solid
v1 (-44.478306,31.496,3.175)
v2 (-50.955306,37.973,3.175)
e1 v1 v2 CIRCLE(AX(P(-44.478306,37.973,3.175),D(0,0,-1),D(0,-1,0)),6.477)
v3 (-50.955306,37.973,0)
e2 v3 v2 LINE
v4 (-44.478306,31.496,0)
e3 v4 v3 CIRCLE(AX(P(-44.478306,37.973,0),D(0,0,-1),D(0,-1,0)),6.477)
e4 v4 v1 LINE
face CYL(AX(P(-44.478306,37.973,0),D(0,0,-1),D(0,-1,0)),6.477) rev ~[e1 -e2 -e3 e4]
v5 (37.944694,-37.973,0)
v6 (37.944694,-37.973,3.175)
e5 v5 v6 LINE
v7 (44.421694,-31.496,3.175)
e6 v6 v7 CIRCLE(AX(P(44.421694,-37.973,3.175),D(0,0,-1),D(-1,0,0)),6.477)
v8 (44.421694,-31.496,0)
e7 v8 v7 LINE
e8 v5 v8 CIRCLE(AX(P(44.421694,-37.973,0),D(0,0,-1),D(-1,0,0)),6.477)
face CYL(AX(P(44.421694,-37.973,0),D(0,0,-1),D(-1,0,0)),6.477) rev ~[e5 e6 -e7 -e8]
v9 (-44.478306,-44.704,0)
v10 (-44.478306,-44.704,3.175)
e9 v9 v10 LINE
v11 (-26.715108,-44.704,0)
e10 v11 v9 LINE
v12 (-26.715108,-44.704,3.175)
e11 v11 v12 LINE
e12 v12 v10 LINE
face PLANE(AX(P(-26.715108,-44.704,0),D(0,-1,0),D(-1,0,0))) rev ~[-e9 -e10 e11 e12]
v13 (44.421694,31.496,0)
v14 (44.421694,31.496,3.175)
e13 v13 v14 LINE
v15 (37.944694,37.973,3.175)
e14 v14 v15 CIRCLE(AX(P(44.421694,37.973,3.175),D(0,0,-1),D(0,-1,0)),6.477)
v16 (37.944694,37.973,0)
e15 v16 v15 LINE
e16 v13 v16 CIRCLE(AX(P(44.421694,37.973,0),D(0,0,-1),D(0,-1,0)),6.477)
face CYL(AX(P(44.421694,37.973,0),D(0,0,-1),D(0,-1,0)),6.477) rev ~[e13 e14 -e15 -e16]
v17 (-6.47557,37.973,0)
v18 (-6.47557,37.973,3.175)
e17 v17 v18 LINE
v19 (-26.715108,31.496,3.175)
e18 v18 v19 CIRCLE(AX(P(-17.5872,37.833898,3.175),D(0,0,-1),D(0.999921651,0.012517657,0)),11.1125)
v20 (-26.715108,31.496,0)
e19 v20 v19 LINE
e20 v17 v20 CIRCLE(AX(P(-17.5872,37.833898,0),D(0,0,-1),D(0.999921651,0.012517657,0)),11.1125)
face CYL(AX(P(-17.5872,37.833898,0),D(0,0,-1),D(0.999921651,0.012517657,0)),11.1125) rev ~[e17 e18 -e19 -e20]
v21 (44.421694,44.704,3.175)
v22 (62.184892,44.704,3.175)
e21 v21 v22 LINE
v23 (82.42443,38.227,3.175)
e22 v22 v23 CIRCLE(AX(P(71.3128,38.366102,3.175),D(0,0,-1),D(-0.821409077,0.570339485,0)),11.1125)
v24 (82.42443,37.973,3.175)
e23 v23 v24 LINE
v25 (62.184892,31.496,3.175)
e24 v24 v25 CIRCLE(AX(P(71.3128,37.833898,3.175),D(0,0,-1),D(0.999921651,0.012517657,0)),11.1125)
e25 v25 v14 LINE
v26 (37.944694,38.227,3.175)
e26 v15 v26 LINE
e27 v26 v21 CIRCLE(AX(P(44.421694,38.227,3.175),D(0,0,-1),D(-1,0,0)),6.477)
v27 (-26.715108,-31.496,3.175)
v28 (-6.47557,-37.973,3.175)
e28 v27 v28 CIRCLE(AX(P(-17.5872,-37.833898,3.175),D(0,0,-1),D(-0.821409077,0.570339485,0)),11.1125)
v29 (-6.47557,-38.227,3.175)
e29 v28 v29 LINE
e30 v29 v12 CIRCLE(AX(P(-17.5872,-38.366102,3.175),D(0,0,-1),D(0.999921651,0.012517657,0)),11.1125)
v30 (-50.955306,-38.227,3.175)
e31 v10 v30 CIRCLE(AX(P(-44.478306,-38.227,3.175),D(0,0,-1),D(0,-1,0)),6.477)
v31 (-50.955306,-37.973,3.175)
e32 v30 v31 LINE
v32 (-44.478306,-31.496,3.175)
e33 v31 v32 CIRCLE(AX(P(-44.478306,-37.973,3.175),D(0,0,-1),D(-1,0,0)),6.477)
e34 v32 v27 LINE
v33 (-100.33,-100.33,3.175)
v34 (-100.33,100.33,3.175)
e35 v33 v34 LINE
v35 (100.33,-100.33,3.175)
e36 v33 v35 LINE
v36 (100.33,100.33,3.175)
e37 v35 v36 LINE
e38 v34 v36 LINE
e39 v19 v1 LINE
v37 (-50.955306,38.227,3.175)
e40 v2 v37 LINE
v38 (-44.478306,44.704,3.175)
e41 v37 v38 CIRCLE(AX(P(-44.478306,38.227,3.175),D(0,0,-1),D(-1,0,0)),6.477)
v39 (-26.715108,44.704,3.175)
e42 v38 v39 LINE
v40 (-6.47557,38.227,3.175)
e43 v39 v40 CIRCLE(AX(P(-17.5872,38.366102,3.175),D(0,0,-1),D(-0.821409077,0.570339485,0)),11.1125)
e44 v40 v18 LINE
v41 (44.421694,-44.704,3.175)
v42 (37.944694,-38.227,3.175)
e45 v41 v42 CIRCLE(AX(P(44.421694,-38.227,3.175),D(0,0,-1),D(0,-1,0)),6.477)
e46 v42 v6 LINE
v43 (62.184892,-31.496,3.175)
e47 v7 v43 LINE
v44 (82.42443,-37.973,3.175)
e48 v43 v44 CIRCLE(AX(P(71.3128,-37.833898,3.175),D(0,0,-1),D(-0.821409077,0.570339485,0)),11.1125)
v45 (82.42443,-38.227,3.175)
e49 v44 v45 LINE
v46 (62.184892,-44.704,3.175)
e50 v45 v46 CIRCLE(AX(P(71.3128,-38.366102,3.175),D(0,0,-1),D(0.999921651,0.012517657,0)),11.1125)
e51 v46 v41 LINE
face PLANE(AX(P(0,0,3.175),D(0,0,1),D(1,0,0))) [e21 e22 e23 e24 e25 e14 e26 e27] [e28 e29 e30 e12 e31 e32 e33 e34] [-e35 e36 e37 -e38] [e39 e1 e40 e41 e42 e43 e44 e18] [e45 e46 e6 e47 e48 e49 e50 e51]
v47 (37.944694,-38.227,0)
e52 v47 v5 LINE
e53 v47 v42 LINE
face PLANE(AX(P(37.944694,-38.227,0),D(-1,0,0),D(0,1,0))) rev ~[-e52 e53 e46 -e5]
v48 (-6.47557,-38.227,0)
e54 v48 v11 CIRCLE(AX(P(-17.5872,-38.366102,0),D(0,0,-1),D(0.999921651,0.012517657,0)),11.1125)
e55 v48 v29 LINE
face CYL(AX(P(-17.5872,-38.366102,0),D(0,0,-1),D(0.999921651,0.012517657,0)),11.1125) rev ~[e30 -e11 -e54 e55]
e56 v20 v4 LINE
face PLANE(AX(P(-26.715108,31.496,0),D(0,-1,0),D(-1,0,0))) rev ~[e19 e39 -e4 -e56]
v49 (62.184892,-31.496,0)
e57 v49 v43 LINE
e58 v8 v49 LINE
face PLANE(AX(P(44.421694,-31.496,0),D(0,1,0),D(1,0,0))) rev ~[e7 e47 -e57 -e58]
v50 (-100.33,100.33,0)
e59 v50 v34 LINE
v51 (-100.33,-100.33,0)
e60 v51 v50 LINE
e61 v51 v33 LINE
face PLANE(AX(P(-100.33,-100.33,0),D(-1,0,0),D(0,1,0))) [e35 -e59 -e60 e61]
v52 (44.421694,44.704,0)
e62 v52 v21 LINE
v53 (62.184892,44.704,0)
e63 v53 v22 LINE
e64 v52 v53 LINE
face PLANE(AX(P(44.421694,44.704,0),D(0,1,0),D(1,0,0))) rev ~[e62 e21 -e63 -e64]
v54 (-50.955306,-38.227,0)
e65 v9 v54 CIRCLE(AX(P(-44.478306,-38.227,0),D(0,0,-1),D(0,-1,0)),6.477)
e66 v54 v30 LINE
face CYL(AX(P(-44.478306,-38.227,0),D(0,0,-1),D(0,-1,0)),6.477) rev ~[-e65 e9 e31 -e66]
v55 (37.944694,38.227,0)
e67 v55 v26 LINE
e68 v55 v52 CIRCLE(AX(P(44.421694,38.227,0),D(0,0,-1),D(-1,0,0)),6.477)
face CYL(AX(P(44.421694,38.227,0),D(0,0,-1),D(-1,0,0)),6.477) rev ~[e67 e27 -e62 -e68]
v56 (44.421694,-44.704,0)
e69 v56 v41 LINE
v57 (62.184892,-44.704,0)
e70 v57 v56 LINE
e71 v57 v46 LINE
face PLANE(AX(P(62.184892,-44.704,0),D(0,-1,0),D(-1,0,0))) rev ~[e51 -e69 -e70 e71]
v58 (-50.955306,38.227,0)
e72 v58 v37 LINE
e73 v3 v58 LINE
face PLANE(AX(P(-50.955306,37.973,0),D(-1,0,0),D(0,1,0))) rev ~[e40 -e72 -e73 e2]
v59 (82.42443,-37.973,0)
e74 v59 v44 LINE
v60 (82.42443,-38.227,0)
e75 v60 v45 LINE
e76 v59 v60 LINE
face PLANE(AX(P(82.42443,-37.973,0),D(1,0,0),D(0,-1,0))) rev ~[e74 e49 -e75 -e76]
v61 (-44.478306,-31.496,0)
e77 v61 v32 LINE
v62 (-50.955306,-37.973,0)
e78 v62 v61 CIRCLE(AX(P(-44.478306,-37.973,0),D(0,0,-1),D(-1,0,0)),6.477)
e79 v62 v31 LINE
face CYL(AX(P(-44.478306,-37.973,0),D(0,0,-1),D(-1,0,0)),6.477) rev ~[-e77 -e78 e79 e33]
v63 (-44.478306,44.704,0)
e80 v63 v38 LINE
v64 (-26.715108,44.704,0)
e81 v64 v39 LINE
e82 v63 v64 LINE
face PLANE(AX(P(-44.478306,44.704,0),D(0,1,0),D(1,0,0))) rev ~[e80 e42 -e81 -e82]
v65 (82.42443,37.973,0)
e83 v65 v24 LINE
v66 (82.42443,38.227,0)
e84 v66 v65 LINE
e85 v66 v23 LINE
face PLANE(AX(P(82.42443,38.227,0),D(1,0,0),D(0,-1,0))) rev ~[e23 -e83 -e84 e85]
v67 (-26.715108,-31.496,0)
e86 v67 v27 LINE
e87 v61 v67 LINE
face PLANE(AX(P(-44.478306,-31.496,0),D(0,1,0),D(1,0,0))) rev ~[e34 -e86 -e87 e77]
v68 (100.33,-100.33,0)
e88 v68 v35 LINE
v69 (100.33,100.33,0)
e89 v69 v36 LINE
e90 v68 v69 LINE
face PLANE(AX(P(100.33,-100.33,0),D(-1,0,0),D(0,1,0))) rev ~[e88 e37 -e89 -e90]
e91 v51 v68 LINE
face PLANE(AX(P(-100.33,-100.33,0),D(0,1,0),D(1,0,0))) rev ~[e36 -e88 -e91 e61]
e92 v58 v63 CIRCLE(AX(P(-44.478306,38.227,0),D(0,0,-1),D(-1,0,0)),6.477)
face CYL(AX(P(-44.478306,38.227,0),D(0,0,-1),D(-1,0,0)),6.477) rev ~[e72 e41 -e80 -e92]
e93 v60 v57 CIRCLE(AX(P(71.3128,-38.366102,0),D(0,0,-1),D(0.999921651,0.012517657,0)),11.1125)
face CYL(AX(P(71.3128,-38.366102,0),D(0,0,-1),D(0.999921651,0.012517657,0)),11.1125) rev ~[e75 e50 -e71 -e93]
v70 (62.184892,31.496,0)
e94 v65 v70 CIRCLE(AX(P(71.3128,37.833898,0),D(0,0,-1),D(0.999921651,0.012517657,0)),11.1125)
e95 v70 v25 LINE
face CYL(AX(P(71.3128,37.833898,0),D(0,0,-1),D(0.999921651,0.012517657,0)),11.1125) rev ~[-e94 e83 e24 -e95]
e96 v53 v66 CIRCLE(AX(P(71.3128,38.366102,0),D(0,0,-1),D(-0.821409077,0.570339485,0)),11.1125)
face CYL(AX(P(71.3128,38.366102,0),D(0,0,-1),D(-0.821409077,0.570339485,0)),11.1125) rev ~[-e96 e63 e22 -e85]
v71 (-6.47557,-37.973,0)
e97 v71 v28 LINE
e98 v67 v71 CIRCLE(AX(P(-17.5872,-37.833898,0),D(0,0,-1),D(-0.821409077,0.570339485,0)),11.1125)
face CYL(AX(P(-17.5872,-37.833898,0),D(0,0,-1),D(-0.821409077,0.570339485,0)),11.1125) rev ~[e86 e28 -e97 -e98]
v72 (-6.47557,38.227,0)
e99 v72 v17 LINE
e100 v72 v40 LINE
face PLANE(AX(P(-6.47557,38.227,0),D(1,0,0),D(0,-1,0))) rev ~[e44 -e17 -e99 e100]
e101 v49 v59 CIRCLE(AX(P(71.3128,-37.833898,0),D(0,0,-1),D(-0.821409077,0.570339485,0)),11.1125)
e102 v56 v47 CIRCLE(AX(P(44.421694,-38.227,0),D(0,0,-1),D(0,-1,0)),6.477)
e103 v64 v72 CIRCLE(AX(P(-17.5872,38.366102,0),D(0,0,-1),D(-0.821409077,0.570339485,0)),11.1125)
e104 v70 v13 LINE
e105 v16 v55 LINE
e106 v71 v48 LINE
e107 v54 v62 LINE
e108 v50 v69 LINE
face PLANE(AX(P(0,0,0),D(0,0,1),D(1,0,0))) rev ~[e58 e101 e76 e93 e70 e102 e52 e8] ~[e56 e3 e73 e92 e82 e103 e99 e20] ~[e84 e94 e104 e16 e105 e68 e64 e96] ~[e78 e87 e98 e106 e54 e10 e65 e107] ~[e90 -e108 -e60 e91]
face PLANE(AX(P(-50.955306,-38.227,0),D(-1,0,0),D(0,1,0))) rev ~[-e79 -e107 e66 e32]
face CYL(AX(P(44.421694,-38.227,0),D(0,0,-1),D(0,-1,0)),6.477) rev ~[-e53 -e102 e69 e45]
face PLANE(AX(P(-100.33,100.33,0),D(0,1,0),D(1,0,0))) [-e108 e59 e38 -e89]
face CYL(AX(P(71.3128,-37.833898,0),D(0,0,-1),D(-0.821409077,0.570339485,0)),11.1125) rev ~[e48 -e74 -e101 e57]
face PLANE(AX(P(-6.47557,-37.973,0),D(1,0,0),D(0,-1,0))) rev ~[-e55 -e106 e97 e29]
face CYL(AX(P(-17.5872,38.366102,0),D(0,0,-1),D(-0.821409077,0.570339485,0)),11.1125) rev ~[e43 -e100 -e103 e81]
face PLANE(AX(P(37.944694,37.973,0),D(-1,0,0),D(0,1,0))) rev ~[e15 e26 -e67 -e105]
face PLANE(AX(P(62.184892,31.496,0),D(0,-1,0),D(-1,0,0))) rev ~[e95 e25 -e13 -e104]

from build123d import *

# Parameters (mm, degrees)
F0_W     = 200.66
F0_H     = 200.66
F1_DEPTH = 3.175


# Not quite as in the source:
# - a length typed as a fraction of an inch, garbled in the dataset ("3 / 203.2 mm" for 3/8 in), is restored


with BuildPart() as f1:
    # F0 (on Top) → F1 (new body)
    with BuildSketch(Plane.XY):
        Rectangle(F0_W, F0_H)
        with BuildLine():
            Line((-6.4755703305, -37.973), (-6.4755703305, -38.227))
            ThreePointArc((-6.4755703305, -38.227), (-14.2002143688, -48.9498629888), (-26.715108043, -44.704))
            Line((-26.715108043, -44.704), (-30.0367761716, -44.704))
            Line((-30.0367761716, -44.704), (-44.4783061624, -44.704))
            ThreePointArc((-44.4783061624, -44.704), (-49.0582367841, -42.8069306217), (-50.9553061624, -38.227))
            Line((-50.9553061624, -38.227), (-50.9553061624, -37.973))
            ThreePointArc((-50.9553061624, -37.973), (-49.0582367841, -33.3930693783), (-44.4783061624, -31.496))
            Line((-44.4783061624, -31.496), (-30.0367761716, -31.496))
            Line((-30.0367761716, -31.496), (-26.715108043, -31.496))
            ThreePointArc((-26.715108043, -31.496), (-14.2002143688, -27.2501370112), (-6.4755703305, -37.973))
        make_face(mode=Mode.SUBTRACT)
        with BuildLine():
            Line((82.4244296695, -37.973), (82.4244296695, -38.227))
            ThreePointArc((82.4244296695, -38.227), (74.6997856312, -48.9498629888), (62.184891957, -44.704))
            Line((62.184891957, -44.704), (58.8632238284, -44.704))
            Line((58.8632238284, -44.704), (44.4216938376, -44.704))
            ThreePointArc((44.4216938376, -44.704), (39.8417632159, -42.8069306217), (37.9446938376, -38.227))
            Line((37.9446938376, -38.227), (37.9446938376, -37.973))
            ThreePointArc((37.9446938376, -37.973), (39.8417632159, -33.3930693783), (44.4216938376, -31.496))
            Line((44.4216938376, -31.496), (58.8632238284, -31.496))
            Line((58.8632238284, -31.496), (62.184891957, -31.496))
            ThreePointArc((62.184891957, -31.496), (74.6997856312, -27.2501370112), (82.4244296695, -37.973))
        make_face(mode=Mode.SUBTRACT)
        with BuildLine():
            ThreePointArc((-50.9553061624, 38.227), (-49.0582367841, 42.8069306217), (-44.4783061624, 44.704))
            Line((-44.4783061624, 44.704), (-30.0367761716, 44.704))
            Line((-30.0367761716, 44.704), (-26.715108043, 44.704))
            ThreePointArc((-26.715108043, 44.704), (-14.2002143688, 48.9498629888), (-6.4755703305, 38.227))
            Line((-6.4755703305, 38.227), (-6.4755703305, 37.973))
            ThreePointArc((-6.4755703305, 37.973), (-14.2002143688, 27.2501370112), (-26.715108043, 31.496))
            Line((-26.715108043, 31.496), (-30.0367761716, 31.496))
            Line((-30.0367761716, 31.496), (-44.4783061624, 31.496))
            ThreePointArc((-44.4783061624, 31.496), (-49.0582367841, 33.3930693783), (-50.9553061624, 37.973))
            Line((-50.9553061624, 37.973), (-50.9553061624, 38.227))
        make_face(mode=Mode.SUBTRACT)
        with BuildLine():
            Line((82.4244296695, 38.227), (82.4244296695, 37.973))
            ThreePointArc((82.4244296695, 37.973), (74.6997856312, 27.2501370112), (62.184891957, 31.496))
            Line((62.184891957, 31.496), (58.8632238284, 31.496))
            Line((58.8632238284, 31.496), (44.4216938376, 31.496))
            ThreePointArc((44.4216938376, 31.496), (39.8417632159, 33.3930693783), (37.9446938376, 37.973))
            Line((37.9446938376, 37.973), (37.9446938376, 38.227))
            ThreePointArc((37.9446938376, 38.227), (39.8417632159, 42.8069306217), (44.4216938376, 44.704))
            Line((44.4216938376, 44.704), (58.8632238284, 44.704))
            Line((58.8632238284, 44.704), (62.184891957, 44.704))
            ThreePointArc((62.184891957, 44.704), (74.6997856312, 48.9498629888), (82.4244296695, 38.227))
        make_face(mode=Mode.SUBTRACT)
    extrude(amount=F1_DEPTH)


solid = f1.part
